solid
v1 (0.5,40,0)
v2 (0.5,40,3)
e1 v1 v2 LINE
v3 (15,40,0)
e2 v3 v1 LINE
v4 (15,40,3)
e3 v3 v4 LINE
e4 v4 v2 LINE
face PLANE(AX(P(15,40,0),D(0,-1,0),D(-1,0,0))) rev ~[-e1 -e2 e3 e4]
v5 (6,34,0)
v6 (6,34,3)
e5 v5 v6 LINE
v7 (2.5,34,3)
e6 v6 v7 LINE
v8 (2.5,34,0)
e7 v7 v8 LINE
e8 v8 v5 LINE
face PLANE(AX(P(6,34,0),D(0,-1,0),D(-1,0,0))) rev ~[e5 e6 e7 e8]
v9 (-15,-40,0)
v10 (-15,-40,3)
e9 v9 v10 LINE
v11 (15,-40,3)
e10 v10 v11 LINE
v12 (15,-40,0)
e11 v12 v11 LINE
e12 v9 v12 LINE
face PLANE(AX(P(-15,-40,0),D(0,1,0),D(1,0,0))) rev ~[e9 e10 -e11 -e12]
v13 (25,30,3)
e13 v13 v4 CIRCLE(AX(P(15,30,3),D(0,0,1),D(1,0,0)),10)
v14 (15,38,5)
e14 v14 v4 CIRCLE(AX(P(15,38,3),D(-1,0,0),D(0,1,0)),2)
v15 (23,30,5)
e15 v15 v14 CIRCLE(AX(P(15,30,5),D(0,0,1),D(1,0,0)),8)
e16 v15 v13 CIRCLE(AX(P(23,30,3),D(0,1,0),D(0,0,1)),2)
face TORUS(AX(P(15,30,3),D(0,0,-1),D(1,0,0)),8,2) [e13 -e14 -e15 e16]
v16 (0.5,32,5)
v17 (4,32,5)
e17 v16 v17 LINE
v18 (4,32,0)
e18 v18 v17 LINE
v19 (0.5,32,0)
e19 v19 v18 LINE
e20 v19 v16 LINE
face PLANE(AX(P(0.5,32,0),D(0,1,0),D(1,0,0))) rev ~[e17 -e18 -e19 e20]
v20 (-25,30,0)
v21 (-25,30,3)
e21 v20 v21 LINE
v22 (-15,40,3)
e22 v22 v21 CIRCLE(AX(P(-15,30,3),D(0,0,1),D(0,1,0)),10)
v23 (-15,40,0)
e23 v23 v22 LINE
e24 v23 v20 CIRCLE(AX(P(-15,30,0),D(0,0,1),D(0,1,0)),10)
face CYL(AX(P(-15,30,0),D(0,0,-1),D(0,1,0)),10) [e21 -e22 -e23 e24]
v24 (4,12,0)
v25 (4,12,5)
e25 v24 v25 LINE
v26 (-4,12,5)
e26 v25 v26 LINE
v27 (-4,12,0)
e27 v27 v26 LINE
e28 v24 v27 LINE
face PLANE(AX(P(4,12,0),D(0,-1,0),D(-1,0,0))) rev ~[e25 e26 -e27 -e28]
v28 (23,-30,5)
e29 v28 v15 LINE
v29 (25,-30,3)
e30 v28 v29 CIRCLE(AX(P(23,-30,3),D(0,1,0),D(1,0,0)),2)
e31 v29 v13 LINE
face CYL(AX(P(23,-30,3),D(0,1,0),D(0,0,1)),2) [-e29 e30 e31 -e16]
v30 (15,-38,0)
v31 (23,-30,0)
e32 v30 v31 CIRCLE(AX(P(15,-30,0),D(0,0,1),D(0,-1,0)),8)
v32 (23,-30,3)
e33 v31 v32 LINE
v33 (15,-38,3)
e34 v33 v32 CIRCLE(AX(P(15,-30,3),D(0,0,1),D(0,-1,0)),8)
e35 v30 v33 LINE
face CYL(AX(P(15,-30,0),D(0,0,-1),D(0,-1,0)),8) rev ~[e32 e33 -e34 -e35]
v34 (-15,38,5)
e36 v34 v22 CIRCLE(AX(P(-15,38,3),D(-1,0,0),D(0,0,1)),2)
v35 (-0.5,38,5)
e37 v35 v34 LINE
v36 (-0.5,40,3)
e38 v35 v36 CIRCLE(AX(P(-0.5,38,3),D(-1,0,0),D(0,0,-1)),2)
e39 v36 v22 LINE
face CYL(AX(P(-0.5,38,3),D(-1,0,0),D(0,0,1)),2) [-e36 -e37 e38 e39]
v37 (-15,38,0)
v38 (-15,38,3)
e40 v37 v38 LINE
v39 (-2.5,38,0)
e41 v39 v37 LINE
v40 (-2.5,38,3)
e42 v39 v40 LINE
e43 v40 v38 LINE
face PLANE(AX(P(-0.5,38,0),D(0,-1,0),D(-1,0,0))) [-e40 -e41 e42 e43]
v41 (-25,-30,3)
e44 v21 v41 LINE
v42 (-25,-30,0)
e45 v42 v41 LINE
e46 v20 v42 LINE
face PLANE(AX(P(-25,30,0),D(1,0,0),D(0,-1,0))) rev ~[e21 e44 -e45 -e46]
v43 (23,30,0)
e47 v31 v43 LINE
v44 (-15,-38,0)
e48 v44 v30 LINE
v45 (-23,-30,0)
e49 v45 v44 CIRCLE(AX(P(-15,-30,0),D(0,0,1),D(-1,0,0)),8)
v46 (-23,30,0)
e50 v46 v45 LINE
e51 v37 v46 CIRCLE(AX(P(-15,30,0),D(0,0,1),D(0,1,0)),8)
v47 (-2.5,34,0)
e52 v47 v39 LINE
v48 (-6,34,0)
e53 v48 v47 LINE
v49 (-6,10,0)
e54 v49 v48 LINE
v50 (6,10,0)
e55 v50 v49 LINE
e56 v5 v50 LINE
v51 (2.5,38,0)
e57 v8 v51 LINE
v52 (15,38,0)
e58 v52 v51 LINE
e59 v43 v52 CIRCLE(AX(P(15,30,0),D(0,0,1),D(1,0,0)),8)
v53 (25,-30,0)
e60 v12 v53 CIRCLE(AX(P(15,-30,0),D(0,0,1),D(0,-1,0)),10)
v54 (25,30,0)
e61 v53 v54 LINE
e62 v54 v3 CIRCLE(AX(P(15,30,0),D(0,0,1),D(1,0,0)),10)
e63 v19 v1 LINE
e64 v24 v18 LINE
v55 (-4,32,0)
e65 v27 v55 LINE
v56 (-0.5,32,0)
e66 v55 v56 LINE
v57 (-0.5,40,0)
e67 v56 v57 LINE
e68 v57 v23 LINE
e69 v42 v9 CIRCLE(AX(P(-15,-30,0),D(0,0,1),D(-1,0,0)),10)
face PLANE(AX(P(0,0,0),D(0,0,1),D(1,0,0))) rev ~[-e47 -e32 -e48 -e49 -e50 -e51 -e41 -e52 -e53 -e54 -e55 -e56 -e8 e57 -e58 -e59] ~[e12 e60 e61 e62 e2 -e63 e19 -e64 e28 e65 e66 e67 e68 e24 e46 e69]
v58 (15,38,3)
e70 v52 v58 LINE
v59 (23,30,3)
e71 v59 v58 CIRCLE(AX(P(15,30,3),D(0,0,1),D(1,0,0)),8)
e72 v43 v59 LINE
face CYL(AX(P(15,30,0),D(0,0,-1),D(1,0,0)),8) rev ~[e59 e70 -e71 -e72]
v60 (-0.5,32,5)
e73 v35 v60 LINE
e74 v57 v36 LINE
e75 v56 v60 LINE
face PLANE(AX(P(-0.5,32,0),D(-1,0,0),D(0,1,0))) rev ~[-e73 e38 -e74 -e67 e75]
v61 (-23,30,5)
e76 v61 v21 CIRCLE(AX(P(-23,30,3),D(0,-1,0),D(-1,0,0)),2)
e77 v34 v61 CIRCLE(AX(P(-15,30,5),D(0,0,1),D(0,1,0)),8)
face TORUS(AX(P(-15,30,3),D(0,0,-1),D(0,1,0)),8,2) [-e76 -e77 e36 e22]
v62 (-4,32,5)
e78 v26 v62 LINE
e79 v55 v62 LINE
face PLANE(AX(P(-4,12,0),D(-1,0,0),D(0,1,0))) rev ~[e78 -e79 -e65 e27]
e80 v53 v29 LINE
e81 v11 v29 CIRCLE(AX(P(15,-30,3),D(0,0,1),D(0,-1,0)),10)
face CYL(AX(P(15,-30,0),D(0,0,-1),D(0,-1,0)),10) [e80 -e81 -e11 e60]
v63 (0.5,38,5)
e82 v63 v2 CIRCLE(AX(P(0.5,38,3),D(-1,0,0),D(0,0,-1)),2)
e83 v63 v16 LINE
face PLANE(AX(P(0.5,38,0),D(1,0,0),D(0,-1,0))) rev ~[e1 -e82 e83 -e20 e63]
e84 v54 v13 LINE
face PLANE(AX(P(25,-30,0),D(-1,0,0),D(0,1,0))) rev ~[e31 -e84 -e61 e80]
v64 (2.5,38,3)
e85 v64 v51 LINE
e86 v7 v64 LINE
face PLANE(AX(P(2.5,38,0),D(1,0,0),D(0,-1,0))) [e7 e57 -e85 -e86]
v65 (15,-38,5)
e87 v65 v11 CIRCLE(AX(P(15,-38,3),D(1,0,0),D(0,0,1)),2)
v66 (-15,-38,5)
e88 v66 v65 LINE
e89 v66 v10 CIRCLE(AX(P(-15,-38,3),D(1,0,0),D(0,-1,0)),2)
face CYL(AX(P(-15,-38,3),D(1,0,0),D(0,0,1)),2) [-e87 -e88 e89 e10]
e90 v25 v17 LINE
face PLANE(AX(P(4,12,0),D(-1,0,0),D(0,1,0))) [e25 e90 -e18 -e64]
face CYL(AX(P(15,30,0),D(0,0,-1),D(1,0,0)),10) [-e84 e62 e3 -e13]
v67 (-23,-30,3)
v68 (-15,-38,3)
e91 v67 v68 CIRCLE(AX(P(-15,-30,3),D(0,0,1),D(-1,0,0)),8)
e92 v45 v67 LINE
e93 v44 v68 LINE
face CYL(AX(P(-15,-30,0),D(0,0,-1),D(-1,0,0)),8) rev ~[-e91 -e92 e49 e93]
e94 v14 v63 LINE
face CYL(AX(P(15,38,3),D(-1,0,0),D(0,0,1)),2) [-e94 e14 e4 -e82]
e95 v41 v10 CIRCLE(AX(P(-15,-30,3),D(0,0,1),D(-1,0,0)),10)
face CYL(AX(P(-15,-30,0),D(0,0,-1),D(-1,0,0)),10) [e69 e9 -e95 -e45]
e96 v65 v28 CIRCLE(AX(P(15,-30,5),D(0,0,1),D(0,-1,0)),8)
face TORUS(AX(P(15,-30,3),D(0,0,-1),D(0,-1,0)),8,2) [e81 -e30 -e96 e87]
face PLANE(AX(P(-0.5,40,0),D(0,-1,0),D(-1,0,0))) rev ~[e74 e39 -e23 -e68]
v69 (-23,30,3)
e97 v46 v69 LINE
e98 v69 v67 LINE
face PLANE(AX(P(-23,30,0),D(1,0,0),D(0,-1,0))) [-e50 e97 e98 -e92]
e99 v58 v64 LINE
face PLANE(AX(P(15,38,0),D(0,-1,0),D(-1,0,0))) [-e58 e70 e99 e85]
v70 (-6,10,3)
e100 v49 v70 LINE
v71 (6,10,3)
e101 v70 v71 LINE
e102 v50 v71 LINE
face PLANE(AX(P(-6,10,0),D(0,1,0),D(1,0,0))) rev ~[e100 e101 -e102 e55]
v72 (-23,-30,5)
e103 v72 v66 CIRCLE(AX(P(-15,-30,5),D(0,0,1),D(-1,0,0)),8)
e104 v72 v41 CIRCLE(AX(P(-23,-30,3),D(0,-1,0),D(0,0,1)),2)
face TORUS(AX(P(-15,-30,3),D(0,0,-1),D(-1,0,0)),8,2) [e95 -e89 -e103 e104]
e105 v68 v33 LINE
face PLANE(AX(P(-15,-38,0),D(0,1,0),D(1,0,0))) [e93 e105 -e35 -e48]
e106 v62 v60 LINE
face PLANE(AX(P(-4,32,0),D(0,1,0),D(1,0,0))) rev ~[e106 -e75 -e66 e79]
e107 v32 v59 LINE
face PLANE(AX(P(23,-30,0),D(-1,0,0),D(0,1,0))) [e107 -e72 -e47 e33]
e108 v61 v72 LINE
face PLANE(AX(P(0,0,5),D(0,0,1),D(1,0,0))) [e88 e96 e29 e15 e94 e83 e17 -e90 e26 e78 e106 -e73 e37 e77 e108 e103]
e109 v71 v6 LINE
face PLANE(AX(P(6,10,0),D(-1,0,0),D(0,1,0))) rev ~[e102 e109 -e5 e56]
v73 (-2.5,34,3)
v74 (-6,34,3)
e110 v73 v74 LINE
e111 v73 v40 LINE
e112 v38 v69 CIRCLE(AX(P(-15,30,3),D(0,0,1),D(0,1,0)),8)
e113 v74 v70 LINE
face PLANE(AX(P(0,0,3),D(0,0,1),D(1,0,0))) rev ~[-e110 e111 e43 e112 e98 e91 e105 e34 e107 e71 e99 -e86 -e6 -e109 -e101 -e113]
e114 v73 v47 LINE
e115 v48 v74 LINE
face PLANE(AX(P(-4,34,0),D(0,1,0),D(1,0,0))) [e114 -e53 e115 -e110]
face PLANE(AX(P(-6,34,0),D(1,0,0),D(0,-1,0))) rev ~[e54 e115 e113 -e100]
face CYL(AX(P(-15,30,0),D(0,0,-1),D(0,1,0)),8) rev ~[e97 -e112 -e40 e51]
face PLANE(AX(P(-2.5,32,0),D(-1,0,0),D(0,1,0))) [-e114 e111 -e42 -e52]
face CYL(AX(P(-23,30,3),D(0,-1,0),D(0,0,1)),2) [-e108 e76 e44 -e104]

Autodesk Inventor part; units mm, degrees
ref_plane "YZ Plane" through (0, 0, 0) normal (1, 0, 0) x (0, 1, 0)
ref_plane "XZ Plane" through (0, 0, 0) normal (0, 1, 0) x (-1, 0, 0)
ref_plane "XY Plane" through (0, 0, 0) normal (0, 0, 1) x (1, 0, 0)
sketch "Esboço3" plane through (0, 0, 0) normal (0, 0, 1) x (1, 0, 0)
  arc A0 (-23, -30) -> (-15, -38) centre (-15, -30) ccw projected
  line L0 (-23, -30) -> (-23, 30) projected
  arc A1 (-15, 38) -> (-23, 30) centre (-15, 30) ccw projected
  line L1 (-15, 38) -> (15, 38) projected
  arc A2 (23, 30) -> (15, 38) centre (15, 30) ccw projected
  line L2 (23, 30) -> (23, -30) projected
  arc A3 (15, -38) -> (23, -30) centre (15, -30) ccw projected
  line L3 (15, -38) -> (-15, -38) projected
  arc A4 (-25, -30) -> (-15, -40) centre (-15, -30) ccw projected
  line L4 (-15, -40) -> (15, -40) projected
  arc A5 (15, -40) -> (25, -30) centre (15, -30) ccw projected
  line L5 (25, -30) -> (25, 30) projected
  arc A6 (25, 30) -> (15, 40) centre (15, 30) ccw projected
  line L6 (15, 40) -> (-15, 40) projected
  arc A7 (-15, 40) -> (-25, 30) centre (-15, 30) ccw projected
  line L7 (-25, 30) -> (-25, -30) projected
  line L8 (-4, 12) -> (-4, 32) projected
  line L9 (-4, 32) -> (4, 32) projected
  line L10 (4, 12) -> (4, 32) projected
  line L11 (4, 12) -> (-4, 12) projected
  line L12 (-0.5, 40) -> (0.5, 40)
  line L13 (0.5, 40) -> (0.5, 32)
  line L14 (0.5, 32) -> (-0.5, 32)
  line L15 (-0.5, 32) -> (-0.5, 40)
  point P0 (0, 0)
  point P1 (0.5, 36)
  point P2 (0, 32)
  point P3 (-0.5, 38)
  point P4 (0.5, 38)
  dimension "d2" = 1
  dimension "d3" = 0
  dimension "d4" = 3.5
extrude "Extrusão1" add sketch "Esboço3" along normal blind 5 contours L0 A1 L1 L15 L9 L8 L11 L10 L13 A2 L2 A3 L3 A0 | A0 L3 A3 L2 A2 L1 L13 L6 A6 L5 A5 L4 A4 L7 A7 L15 A1 L0
fillet "Arredondamento1" radius 2 9 edges at (-22.0711, 37.0711, 5) (-25, 0, 5) (-22.0711, -37.0711, 5) (0, -40, 5) (22.0711, -37.0711, 5) (25, 0, 5) (22.0711, 37.0711, 5) (7.75, 40, 5) (-7.75, 40, 5)
shell "Casca1" thickness 2 removed faces 1 at (1.3333, -22.6667, 0)
properties part number "Tampa"
